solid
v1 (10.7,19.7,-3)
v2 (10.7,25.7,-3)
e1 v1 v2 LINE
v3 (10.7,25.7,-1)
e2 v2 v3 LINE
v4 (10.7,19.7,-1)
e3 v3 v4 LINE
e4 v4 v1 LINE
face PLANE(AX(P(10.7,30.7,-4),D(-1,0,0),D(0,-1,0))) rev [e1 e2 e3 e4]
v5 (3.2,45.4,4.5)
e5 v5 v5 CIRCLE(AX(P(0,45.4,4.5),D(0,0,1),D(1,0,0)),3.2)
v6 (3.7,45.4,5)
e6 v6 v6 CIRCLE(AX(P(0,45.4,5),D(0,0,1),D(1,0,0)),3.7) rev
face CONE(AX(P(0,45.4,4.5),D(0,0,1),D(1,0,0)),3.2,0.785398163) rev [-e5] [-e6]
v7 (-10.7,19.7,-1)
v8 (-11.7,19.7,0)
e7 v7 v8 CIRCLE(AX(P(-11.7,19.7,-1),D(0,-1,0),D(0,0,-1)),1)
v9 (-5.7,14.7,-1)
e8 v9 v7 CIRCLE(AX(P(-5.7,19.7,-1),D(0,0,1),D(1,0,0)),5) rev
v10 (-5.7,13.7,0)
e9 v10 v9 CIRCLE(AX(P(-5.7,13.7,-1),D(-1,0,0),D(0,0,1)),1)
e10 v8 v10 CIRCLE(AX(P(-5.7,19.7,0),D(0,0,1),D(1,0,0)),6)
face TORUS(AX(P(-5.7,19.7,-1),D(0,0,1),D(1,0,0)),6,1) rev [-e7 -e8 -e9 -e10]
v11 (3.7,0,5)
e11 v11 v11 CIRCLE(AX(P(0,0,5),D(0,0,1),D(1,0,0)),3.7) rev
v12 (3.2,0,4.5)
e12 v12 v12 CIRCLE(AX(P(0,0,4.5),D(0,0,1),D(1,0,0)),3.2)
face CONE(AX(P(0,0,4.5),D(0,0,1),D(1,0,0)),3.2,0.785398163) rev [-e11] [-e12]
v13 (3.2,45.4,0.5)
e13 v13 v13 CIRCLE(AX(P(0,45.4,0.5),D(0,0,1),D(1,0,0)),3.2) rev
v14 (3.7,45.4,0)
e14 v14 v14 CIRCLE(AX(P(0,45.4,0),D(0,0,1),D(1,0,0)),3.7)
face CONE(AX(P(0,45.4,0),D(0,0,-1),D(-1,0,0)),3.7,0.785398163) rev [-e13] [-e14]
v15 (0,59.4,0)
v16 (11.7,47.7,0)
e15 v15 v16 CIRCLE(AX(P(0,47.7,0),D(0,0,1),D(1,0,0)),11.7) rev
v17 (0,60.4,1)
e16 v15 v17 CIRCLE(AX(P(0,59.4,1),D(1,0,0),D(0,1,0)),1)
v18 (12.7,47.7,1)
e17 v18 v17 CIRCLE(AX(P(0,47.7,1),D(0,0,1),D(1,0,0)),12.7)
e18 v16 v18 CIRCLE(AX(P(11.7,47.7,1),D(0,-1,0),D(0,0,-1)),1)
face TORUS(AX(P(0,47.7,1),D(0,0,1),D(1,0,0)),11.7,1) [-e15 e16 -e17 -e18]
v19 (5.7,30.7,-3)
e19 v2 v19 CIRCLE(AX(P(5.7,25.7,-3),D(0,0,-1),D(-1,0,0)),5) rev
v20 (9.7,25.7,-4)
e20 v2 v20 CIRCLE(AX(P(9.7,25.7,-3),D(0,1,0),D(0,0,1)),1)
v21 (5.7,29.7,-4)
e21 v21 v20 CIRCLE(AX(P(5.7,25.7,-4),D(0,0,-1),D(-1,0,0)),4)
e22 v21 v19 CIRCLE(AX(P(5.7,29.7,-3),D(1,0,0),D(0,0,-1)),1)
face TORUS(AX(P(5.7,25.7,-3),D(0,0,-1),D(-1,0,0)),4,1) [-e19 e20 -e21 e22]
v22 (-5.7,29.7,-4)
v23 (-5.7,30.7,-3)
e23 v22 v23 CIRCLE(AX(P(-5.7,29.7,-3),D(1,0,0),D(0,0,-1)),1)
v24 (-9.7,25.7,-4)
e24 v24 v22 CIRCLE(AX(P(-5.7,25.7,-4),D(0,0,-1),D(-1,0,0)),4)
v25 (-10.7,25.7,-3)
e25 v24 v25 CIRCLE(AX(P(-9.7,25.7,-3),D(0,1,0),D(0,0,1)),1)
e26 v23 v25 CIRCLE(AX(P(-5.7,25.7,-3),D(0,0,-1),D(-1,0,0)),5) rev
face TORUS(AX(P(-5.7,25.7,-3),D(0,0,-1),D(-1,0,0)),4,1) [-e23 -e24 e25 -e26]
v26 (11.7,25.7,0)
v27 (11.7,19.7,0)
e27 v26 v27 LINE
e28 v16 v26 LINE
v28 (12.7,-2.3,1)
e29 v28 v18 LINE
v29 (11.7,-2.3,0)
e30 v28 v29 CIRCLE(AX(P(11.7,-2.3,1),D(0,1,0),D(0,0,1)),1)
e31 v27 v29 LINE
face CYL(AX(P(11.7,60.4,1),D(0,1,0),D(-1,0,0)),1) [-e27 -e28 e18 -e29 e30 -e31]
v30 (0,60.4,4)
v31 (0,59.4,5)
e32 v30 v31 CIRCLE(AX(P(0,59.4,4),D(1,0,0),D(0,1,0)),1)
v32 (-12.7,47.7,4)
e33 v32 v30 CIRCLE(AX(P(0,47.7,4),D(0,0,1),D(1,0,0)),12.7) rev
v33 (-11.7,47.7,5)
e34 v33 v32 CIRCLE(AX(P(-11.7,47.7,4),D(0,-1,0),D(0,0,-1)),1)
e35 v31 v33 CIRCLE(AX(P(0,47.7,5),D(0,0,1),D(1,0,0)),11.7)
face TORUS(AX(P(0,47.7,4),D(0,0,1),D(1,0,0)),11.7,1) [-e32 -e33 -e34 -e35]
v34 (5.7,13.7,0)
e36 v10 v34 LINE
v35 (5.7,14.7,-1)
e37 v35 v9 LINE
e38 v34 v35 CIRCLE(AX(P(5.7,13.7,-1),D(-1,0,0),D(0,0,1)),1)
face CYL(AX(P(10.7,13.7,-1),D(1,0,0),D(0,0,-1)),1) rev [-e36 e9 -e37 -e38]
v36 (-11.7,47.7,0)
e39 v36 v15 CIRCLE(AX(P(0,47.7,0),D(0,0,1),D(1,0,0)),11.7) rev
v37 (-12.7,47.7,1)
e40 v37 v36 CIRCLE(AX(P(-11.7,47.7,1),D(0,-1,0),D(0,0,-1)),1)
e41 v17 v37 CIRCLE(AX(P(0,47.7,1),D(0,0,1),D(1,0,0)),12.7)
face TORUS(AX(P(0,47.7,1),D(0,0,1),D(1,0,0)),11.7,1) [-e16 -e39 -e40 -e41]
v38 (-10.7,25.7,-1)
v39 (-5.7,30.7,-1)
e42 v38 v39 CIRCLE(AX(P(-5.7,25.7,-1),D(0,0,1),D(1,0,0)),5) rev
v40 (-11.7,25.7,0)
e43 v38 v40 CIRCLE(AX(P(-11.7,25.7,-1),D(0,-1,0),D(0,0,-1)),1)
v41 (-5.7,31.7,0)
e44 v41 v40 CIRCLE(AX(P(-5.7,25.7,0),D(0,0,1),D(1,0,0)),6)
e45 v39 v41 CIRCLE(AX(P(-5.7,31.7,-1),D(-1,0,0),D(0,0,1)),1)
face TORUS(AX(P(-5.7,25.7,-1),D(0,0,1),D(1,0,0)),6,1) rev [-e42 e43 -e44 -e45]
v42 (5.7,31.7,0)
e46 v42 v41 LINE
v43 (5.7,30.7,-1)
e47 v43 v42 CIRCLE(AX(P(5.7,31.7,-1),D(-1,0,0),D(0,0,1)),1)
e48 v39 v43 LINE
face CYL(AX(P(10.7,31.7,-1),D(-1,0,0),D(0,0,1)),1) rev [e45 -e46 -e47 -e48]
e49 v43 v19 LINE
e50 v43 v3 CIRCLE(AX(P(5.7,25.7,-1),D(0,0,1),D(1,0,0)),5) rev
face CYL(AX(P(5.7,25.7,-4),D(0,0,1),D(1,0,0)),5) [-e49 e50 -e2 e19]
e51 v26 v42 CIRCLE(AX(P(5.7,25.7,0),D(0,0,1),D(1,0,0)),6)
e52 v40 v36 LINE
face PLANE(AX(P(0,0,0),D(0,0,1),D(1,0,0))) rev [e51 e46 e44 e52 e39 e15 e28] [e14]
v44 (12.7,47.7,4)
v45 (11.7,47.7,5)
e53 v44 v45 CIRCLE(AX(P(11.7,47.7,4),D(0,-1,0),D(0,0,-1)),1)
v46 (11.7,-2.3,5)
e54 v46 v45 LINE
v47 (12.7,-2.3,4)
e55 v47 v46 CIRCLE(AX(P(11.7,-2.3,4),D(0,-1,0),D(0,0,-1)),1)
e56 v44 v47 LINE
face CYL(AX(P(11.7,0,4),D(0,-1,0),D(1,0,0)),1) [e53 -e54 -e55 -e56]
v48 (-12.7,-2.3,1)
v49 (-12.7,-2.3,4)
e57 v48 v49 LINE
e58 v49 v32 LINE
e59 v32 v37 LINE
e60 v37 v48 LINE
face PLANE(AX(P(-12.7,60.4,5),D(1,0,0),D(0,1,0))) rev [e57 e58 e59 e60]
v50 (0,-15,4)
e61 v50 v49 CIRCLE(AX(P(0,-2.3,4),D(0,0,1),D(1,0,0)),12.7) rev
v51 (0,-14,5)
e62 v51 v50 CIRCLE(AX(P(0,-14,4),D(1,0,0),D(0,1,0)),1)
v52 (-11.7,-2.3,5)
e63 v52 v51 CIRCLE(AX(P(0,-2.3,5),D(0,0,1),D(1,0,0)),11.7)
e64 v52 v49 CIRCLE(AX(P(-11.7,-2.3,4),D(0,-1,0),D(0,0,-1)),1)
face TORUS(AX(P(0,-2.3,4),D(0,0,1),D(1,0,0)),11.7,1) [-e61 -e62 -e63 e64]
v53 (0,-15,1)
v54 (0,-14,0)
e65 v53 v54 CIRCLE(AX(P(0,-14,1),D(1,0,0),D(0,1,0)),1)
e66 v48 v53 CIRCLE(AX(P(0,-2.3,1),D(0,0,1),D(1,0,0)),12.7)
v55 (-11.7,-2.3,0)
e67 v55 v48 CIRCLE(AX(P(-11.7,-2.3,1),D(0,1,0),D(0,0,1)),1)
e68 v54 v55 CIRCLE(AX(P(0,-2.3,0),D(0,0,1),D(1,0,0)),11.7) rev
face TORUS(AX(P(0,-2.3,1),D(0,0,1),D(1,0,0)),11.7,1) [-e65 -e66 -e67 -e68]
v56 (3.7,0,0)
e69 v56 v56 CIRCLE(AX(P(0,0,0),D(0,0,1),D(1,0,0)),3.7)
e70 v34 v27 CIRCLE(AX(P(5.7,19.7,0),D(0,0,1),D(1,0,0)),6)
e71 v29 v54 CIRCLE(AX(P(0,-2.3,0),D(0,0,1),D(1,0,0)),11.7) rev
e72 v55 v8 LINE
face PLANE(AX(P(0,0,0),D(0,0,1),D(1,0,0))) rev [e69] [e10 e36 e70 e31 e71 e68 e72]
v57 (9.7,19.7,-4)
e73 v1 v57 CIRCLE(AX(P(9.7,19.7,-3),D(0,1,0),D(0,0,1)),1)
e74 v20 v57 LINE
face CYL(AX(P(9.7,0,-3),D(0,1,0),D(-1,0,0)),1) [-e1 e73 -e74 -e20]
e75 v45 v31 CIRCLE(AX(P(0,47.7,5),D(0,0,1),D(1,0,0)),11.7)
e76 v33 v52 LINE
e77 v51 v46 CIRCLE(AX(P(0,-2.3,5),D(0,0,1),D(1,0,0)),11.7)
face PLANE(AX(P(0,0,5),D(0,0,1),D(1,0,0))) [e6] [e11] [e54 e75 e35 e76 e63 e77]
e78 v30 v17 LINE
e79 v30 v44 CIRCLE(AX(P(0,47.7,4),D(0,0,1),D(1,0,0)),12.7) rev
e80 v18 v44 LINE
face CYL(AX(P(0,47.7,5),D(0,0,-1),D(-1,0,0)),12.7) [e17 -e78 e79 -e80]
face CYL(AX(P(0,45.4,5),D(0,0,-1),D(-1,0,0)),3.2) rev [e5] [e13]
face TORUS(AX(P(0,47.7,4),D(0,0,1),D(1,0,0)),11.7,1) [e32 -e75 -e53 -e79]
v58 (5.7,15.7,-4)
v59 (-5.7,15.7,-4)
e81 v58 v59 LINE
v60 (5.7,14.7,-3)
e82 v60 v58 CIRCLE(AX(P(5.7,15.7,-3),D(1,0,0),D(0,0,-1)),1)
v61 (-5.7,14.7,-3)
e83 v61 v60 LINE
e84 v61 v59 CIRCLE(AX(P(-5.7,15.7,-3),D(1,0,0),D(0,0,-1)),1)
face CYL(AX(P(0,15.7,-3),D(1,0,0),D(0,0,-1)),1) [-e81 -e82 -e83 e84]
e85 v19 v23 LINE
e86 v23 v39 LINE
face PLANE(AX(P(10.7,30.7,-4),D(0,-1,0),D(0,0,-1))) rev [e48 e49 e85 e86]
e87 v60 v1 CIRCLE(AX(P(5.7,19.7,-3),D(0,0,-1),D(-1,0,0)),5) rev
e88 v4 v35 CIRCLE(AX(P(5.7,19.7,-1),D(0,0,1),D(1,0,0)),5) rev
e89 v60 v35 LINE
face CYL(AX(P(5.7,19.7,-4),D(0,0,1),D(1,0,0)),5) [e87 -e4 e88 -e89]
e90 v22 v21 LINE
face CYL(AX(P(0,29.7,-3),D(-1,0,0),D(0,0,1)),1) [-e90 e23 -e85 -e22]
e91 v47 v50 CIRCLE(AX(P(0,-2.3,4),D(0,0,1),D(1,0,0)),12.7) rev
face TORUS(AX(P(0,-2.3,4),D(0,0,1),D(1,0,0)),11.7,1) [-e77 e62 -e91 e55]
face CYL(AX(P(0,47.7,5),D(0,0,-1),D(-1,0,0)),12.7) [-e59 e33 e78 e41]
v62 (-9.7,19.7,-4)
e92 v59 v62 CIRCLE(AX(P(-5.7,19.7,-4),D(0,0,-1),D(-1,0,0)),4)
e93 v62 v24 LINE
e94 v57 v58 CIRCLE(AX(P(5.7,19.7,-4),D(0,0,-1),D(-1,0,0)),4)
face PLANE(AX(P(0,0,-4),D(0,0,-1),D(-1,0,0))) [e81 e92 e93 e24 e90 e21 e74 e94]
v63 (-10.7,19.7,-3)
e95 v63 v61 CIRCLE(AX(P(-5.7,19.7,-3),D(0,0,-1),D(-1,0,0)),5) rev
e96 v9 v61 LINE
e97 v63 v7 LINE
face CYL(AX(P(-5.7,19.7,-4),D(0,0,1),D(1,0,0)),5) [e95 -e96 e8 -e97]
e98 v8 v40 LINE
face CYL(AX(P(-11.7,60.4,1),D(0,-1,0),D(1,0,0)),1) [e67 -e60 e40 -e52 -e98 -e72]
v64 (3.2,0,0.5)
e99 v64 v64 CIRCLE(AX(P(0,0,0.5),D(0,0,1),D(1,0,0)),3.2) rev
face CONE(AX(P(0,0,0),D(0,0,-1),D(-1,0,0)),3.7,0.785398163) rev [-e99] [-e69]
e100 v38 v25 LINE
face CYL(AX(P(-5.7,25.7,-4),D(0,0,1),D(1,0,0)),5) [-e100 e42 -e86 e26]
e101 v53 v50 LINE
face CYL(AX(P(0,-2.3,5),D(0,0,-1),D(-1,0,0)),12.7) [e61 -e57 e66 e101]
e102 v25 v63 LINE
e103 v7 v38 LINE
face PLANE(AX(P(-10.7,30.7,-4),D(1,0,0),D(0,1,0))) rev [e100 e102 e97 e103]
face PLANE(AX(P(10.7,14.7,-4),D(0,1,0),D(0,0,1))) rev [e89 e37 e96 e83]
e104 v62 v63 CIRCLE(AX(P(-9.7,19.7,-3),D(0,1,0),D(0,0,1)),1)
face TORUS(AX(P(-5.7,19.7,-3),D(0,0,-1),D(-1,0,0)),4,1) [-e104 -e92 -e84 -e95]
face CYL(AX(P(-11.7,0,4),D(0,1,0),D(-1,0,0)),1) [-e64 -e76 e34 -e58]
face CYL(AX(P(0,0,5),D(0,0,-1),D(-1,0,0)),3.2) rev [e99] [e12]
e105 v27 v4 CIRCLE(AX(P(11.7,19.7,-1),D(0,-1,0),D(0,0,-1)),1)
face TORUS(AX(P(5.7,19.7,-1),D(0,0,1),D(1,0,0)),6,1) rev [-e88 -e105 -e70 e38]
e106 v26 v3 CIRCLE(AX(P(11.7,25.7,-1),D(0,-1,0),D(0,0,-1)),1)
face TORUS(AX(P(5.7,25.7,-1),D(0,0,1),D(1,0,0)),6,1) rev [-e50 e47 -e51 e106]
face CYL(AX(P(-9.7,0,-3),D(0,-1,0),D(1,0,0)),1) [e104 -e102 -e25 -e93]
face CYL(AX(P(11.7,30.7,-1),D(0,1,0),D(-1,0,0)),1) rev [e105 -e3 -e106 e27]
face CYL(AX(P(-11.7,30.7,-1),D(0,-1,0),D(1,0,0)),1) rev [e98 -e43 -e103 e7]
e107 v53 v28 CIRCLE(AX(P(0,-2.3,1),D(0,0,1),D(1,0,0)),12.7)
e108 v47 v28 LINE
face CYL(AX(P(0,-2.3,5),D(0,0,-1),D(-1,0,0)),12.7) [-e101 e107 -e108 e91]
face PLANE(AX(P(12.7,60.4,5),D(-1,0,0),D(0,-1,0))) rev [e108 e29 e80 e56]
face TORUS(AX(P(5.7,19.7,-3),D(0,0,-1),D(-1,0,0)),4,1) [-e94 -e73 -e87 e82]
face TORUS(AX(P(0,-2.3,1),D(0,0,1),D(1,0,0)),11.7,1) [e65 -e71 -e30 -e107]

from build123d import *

# Parameters (mm, degrees)
SKETCH1_W        = 25.4
SKETCH1_H        = 75.4
SKETCH1_R        = 3.2
MAINBODY_DEPTH   = 5
SKETCH2_W        = 21.4
SKETCH2_H        = 16
RIBSUPPORT_DEPTH = 4
FILLET_12_7_R    = 12.7
FILLET_5_0_R     = 5
CHAMFER_0_5_SIZE = 0.5
FILLET_1_0_R     = 1


with BuildPart() as part:
    # Sketch1 → mainBody (new body)
    with BuildSketch(Plane.XY):
        with Locations((0, 22.7)):
            Rectangle(SKETCH1_W, SKETCH1_H)
        Circle(SKETCH1_R, mode=Mode.SUBTRACT)
        with Locations((0, 45.4)):
            Circle(SKETCH1_R, mode=Mode.SUBTRACT)
    extrude(amount=MAINBODY_DEPTH)

    # Sketch2 → ribSupport (add)
    with BuildSketch(Plane(origin=(0, 0, 0), x_dir=(-1, 0, 0), z_dir=(0, 0, -1))):
        with Locations((0, 22.7)):
            Rectangle(SKETCH2_W, SKETCH2_H)
    extrude(amount=RIBSUPPORT_DEPTH)

    # Fillet-12.7
    fillet_12_7_edges = [part.edges().sort_by_distance(p)[0] for p in [
        (-12.7, -15, 2.5),
        (12.7, -15, 2.5),
        (-12.7, 60.4, 2.5),
        (12.7, 60.4, 2.5),
    ]]
    fillet(fillet_12_7_edges, radius=FILLET_12_7_R - 0.0001)  # a hair under: the kernel refuses the full size

    # Fillet-5.0
    fillet_5_0_edges = [part.edges().sort_by_distance(p)[0] for p in [
        (10.7, 30.7, -2),
        (10.7, 14.7, -2),
        (-10.7, 14.7, -2),
        (-10.7, 30.7, -2),
    ]]
    fillet(fillet_5_0_edges, radius=FILLET_5_0_R)

    # Chamfer-0.5
    chamfer_0_5_edges = [part.edges().sort_by_distance(p)[0] for p in [
        (-3.2, 0, 0),
        (-3.2, 0, 5),
        (-3.2, 45.4, 0),
        (-3.2, 45.4, 5),
    ]]
    chamfer(chamfer_0_5_edges, length=CHAMFER_0_5_SIZE)

    # Fillet-1.0
    fillet_1_0_edges = [part.edges().sort_by_distance(p)[0] for p in [
        (-12.7, 22.7, 0),
        (12.7, 22.7, 0),
        (8.98028541, 56.68028541, 0),
        (-8.98028541, 56.68028541, 0),
        (8.98028541, -11.28028541, 0),
        (-8.98028541, -11.28028541, 0),
        (-12.7, 22.7, 5),
        (12.7, 22.7, 5),
        (8.98028541, 56.68028541, 5),
        (-8.98028541, 56.68028541, 5),
        (8.98028541, -11.28028541, 5),
        (-8.98028541, -11.28028541, 5),
        (0, 30.7, 0),
        (0, 30.7, -4),
        (-10.7, 22.7, 0),
        (-10.7, 22.7, -4),
        (10.7, 22.7, -4),
        (0, 14.7, -4),
        (9.235533906, 29.235533906, -4),
        (9.235533906, 16.164466094, -4),
        (-9.235533906, 16.164466094, -4),
        (-9.235533906, 29.235533906, -4),
        (0, 14.7, 0),
        (10.7, 22.7, 0),
        (-9.235533906, 29.235533906, 0),
        (-9.235533906, 16.164466094, 0),
        (9.235533906, 16.164466094, 0),
        (9.235533906, 29.235533906, 0),
    ]]
    fillet(fillet_1_0_edges, radius=FILLET_1_0_R - 0.0001)  # a hair under: the kernel refuses the full size


solid = part.part
